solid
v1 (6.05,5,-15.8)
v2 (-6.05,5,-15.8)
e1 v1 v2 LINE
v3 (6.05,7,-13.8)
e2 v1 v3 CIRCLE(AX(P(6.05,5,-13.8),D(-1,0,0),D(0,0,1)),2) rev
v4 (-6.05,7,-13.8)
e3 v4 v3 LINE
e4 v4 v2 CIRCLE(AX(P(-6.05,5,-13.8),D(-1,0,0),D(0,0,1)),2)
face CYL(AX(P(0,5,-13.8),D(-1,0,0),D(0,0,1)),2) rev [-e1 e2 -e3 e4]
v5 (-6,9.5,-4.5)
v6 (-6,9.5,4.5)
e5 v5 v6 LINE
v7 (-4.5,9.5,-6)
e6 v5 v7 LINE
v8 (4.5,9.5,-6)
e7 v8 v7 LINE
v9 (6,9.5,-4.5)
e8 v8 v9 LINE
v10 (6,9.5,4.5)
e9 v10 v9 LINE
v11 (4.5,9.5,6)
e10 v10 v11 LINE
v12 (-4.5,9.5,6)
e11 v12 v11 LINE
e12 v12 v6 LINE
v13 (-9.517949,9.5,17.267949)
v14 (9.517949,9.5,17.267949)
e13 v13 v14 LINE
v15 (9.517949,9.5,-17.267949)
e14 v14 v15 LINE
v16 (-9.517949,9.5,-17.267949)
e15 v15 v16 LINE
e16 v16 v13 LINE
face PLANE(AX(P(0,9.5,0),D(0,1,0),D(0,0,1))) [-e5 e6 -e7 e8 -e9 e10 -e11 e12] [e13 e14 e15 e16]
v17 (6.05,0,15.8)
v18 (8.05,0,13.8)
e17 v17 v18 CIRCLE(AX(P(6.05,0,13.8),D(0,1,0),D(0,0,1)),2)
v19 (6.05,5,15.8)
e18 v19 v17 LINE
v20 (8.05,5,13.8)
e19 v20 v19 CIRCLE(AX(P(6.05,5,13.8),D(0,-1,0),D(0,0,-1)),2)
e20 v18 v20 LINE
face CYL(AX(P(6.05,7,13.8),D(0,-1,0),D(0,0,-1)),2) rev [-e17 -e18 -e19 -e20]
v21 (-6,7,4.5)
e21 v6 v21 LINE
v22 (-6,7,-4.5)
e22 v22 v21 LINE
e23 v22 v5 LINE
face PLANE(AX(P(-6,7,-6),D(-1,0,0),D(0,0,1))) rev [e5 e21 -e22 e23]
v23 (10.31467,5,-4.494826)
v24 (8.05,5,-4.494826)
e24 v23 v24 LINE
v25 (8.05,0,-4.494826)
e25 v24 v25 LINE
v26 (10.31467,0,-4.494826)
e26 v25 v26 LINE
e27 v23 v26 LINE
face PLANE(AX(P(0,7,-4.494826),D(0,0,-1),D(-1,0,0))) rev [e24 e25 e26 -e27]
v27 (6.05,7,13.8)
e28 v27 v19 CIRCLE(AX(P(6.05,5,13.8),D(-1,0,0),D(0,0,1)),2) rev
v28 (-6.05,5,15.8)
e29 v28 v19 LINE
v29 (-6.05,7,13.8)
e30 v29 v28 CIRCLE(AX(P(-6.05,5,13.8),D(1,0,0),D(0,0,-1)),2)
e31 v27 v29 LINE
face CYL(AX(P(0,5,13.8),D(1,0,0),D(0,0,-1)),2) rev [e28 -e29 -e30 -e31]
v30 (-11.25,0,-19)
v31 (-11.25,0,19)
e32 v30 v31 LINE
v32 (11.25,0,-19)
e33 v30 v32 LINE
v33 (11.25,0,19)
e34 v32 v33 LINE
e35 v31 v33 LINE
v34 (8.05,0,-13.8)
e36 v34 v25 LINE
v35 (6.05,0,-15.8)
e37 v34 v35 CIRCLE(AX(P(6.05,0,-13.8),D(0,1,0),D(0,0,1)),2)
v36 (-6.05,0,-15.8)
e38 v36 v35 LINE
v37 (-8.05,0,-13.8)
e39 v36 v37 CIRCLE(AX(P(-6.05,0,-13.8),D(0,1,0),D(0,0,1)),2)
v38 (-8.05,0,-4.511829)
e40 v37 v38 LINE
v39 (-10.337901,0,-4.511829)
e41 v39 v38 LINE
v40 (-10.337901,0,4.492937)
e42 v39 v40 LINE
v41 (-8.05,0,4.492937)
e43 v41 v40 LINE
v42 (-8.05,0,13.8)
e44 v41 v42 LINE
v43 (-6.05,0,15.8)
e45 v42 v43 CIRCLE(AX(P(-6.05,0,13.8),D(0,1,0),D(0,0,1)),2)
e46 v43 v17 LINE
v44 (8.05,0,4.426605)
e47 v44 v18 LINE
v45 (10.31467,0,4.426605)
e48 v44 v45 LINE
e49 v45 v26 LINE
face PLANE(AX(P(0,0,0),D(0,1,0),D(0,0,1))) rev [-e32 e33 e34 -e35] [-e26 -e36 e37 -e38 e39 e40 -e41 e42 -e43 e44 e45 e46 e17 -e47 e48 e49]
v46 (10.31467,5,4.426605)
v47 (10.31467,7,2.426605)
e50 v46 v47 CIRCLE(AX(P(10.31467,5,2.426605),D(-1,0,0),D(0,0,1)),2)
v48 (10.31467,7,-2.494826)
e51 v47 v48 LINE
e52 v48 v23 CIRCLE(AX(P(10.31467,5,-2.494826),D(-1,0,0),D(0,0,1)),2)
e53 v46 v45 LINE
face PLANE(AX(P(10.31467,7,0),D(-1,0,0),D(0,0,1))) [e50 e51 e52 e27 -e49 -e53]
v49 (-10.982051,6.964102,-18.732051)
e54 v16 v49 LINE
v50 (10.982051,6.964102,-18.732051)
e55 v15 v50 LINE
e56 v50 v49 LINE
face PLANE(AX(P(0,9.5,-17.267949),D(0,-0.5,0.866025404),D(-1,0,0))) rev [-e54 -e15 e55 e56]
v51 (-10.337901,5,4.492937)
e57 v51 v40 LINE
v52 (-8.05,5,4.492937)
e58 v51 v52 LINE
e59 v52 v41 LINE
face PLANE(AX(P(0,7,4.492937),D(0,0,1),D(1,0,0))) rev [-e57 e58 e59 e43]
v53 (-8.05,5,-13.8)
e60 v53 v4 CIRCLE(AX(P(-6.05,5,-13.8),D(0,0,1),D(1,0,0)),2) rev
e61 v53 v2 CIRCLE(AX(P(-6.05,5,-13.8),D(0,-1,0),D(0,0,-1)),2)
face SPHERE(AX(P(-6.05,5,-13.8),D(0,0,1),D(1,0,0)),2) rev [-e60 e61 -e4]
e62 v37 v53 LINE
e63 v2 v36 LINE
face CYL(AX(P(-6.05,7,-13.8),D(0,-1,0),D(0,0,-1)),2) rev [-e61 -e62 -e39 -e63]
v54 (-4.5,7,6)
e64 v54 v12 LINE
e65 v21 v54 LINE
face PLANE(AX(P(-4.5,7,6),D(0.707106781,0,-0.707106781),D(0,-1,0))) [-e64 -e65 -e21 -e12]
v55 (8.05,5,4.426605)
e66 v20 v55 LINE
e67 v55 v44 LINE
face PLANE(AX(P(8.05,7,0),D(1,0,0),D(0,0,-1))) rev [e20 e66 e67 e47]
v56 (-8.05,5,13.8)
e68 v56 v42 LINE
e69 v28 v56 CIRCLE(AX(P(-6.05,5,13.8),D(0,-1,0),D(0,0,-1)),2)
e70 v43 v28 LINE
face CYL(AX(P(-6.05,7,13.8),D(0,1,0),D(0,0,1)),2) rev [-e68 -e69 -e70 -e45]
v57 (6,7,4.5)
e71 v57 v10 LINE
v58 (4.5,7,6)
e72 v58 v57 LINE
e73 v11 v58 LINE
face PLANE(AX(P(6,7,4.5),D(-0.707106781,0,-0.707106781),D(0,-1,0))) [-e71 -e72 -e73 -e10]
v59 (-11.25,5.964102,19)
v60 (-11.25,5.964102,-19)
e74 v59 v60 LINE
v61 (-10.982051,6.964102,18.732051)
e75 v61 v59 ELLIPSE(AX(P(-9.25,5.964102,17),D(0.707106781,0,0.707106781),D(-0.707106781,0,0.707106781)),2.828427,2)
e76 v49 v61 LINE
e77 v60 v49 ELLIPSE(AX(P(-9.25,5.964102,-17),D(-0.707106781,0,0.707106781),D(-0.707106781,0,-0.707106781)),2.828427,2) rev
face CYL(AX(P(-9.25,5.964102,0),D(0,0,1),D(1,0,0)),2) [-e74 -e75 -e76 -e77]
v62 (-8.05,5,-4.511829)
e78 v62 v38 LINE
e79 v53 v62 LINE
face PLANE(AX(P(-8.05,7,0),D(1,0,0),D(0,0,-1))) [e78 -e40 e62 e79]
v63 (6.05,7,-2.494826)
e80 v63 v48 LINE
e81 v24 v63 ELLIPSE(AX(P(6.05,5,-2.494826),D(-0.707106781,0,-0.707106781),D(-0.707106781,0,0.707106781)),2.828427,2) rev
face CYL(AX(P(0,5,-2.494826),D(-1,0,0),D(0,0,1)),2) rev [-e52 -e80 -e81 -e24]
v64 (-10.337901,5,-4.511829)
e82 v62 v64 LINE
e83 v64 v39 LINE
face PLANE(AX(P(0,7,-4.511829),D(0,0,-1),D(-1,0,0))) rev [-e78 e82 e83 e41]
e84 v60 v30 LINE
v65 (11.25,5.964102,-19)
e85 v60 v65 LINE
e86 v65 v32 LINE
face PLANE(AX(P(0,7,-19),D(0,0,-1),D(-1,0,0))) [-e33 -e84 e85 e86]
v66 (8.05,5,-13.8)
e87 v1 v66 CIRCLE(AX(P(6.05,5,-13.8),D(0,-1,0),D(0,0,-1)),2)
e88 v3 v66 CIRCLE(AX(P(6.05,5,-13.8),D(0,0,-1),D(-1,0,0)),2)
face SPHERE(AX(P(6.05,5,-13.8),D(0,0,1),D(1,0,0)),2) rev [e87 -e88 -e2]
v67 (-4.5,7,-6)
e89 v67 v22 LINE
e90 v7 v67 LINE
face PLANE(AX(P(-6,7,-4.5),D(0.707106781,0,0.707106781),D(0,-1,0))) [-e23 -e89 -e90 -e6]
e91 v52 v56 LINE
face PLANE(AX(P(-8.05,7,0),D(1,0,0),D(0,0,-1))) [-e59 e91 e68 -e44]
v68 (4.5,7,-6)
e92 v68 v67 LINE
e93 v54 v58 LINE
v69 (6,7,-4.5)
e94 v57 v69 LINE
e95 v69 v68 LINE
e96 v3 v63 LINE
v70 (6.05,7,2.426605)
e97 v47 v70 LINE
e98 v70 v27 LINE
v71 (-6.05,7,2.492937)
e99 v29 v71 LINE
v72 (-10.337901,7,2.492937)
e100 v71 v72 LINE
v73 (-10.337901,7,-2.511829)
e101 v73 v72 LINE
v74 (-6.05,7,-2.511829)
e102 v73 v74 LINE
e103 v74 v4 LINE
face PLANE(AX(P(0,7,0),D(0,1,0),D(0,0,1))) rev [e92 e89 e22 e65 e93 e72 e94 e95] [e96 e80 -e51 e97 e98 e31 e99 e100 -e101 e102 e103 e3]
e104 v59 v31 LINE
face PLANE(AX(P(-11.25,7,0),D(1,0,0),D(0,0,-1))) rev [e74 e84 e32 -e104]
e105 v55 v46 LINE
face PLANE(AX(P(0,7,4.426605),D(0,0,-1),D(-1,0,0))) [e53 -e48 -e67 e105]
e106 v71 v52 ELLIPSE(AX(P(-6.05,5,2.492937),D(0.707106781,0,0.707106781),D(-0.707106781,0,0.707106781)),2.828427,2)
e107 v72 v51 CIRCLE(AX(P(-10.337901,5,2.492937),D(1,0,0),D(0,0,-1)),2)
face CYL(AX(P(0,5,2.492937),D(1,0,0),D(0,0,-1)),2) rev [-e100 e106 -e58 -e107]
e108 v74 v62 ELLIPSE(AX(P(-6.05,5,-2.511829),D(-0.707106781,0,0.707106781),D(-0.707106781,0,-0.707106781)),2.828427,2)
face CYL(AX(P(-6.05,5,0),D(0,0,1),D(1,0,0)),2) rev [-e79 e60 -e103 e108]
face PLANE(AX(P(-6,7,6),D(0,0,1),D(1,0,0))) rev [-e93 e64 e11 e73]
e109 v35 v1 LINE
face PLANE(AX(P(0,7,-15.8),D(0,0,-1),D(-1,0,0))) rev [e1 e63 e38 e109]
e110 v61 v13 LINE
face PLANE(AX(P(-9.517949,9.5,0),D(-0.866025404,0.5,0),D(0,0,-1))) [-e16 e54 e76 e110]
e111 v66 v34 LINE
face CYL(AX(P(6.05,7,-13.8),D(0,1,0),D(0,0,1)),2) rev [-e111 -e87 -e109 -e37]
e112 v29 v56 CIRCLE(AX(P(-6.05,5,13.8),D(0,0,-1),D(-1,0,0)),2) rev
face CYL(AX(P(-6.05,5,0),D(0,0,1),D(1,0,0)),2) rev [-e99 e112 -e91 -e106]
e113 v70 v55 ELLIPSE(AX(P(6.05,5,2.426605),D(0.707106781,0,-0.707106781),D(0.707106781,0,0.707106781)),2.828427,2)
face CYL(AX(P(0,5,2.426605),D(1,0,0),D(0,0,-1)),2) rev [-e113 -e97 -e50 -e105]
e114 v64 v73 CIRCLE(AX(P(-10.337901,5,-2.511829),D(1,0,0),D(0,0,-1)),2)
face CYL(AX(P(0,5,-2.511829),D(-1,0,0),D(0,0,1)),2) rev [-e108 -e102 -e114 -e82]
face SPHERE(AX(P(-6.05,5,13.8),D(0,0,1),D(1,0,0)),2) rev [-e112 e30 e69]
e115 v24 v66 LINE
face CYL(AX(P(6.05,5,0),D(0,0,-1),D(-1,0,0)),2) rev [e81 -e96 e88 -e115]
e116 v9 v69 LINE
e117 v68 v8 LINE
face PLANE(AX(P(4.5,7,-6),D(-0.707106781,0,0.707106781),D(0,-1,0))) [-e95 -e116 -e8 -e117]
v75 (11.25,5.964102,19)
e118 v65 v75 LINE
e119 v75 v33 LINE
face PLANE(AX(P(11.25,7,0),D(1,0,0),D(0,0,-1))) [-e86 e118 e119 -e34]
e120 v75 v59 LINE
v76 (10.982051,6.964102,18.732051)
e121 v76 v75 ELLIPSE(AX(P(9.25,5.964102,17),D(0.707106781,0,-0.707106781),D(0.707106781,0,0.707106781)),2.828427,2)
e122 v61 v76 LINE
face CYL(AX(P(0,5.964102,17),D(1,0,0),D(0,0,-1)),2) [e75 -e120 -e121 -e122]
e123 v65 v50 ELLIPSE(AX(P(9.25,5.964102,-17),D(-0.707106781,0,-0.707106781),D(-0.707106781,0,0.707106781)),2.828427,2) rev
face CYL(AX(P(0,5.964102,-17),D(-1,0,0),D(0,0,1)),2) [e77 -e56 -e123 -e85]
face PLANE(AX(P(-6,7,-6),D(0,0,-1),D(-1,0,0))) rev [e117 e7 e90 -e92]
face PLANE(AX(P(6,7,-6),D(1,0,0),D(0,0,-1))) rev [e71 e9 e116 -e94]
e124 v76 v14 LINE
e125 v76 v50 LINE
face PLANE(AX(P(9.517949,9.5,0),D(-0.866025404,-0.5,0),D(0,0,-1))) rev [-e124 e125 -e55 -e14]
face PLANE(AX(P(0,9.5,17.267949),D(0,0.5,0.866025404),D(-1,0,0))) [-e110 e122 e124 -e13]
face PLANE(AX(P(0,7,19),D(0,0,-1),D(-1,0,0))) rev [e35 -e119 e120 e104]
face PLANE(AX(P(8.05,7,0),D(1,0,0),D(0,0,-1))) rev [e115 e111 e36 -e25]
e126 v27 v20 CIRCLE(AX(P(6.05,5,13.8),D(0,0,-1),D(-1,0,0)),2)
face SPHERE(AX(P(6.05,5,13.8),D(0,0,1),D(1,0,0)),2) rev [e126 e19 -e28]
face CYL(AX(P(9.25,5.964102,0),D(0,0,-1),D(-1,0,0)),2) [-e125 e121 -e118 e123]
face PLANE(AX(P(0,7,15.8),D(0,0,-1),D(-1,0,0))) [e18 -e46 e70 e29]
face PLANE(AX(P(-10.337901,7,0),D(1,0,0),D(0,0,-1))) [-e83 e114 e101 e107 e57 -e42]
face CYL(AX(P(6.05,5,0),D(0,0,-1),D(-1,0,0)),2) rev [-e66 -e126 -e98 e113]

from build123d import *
from OCP.BRepFilletAPI import BRepFilletAPI_MakeChamfer

# Parameters (mm, degrees)
SKETCH1_W           = 22.5
SKETCH1_H           = 38
BOSS_EXTRUDE2_DEPTH = 7
SKETCH2_W           = 22.5
SKETCH2_H           = 38
BOSS_EXTRUDE4_DEPTH = 2.5
SKETCH3_W           = 12
SKETCH3_H           = 12
CUT_EXTRUDE1_DEPTH  = 2.5
CHAMFER1_SIZE       = 1.5
FILLET3_R           = 2
FILLET4_R           = 2
CHAMFER2_SIZE       = 3
CHAMFER2_SIZE2      = 1.732050808
FILLET5_R           = 2


with BuildPart() as part:
    # Sketch1 → Boss-Extrude2 (new body)
    with BuildSketch(Plane(origin=(0, 0, 0), x_dir=(1, 0, 0), z_dir=(0, 1, 0))):
        Rectangle(SKETCH1_W, SKETCH1_H)
        Polygon((-8.05, -15.8), (-8.05, -4.492937268), (-10.337901284, -4.492937268), (-10.337901284, 0), (-10.337901284, 4.511829369), (-8.05, 4.511829369), (-8.05, 15.8), (8.05, 15.8), (8.05, 4.494825775), (10.314669875, 4.494825775), (10.314669875, 0), (10.314669875, -4.426605317), (8.05, -4.426605317), (8.05, -15.8), align=None, mode=Mode.SUBTRACT)
    extrude(amount=BOSS_EXTRUDE2_DEPTH)

    # Sketch2 → Boss-Extrude4 (add)
    with BuildSketch(Plane(origin=(0, 7, 0), x_dir=(1, 0, 0), z_dir=(0, 1, 0))):
        Rectangle(SKETCH2_W, SKETCH2_H)
    extrude(amount=BOSS_EXTRUDE4_DEPTH)

    # Sketch3 → Cut-Extrude1 (cut)
    with BuildSketch(Plane(origin=(0, 9.5, 0), x_dir=(1, 0, 0), z_dir=(0, 1, 0))):
        Rectangle(SKETCH3_W, SKETCH3_H)
    extrude(amount=-CUT_EXTRUDE1_DEPTH, mode=Mode.SUBTRACT)

    # Chamfer1
    chamfer1_edges = [part.edges().sort_by_distance(p)[0] for p in [
        (6, 8.25, -6),
        (6, 8.25, 6),
        (-6, 8.25, 6),
        (-6, 8.25, -6),
    ]]
    chamfer(chamfer1_edges, length=CHAMFER1_SIZE)

    # Fillet3
    fillet3_edges = [part.edges().sort_by_distance(p)[0] for p in [
        (8.05, 7, 10.113302659),
        (0, 7, 15.8),
        (-8.05, 7, 10.146468634),
        (-9.193950642, 7, 4.492937268),
        (-8.05, 3.5, 15.8),
        (8.05, 3.5, 15.8),
        (-9.193950642, 7, -4.511829369),
        (-8.05, 7, -10.155914685),
        (0, 7, -15.8),
        (8.05, 7, -10.147412887),
        (9.182334937, 7, -4.494825775),
        (9.182334937, 7, 4.426605317),
    ]]
    fillet(fillet3_edges, radius=FILLET3_R)

    # Fillet4
    # the kernel refuses this fillet: 2 mm, written as the material it adds along each edge
    with BuildSketch(Plane(origin=(-6.05, 5, -13.8), x_dir=(-1, 0, 0), z_dir=(0, 0, -1))) as fillet4_piece_1_section:
        Polygon((0, 0), (FILLET4_R, 0), (FILLET4_R, FILLET4_R), (0, FILLET4_R), align=None)
    fillet4_piece_1 = extrude(amount=FILLET4_R, mode=Mode.PRIVATE)
    fillet4_piece_1 = fillet4_piece_1 - Plane(origin=(-6.05, 5, -13.8), x_dir=(0.7071067811865475, -0.7071067811865475, 0), z_dir=(0, 0, -1)) * Sphere(FILLET4_R, mode=Mode.PRIVATE)
    add(fillet4_piece_1)
    with BuildSketch(Plane(origin=(6.05, 5, -13.8), x_dir=(0, 0, -1), z_dir=(1, 0, 0))) as fillet4_piece_2_section:
        Polygon((0, 0), (FILLET4_R, 0), (FILLET4_R, FILLET4_R), (0, FILLET4_R), align=None)
    fillet4_piece_2 = extrude(amount=FILLET4_R, mode=Mode.PRIVATE)
    fillet4_piece_2 = fillet4_piece_2 - Plane(origin=(6.05, 5, -13.8), x_dir=(0, -0.7071067811865475, 0.7071067811865475), z_dir=(1, 0, 0)) * Sphere(FILLET4_R, mode=Mode.PRIVATE)
    add(fillet4_piece_2)
    with BuildSketch(Plane(origin=(8.05, 0, -15.8), x_dir=(0, 0, 1), z_dir=(0, 1, 0)), Plane(origin=(-8.05, 0, -15.8), x_dir=(1, 0, 0), z_dir=(0, 1, 0))) as fillet4_piece_3:
        with BuildLine():
            CenterArc((FILLET4_R, -FILLET4_R), FILLET4_R, 90, 90)
            Line((0, -FILLET4_R), (0, 0))
            Line((0, 0), (FILLET4_R, 0))
        make_face()
    extrude(amount=5)

    # Chamfer2: one chamfer whose edges measure the first distance from different faces: ONE call of the kernel's chamfer builder (chamfer() names one face for all edges)
    chamfer2_edges_1 = [part.edges().sort_by_distance(p)[0] for p in [
        (11.25, 9.5, 0),
    ]]
    chamfer2_side_1 = [part.faces().sort_by_distance(p)[0] for p in [
        (11.25, 4.75, 0),
    ]]
    chamfer2_edges_2 = [part.edges().sort_by_distance(p)[0] for p in [
        (0, 9.5, -19),
    ]]
    chamfer2_side_2 = [part.faces().sort_by_distance(p)[0] for p in [
        (0, 4.75, -19),
    ]]
    chamfer2_edges_3 = [part.edges().sort_by_distance(p)[0] for p in [
        (-11.25, 9.5, 0),
    ]]
    chamfer2_side_3 = [part.faces().sort_by_distance(p)[0] for p in [
        (-11.25, 4.75, 0),
    ]]
    chamfer2_edges_4 = [part.edges().sort_by_distance(p)[0] for p in [
        (0, 9.5, 19),
    ]]
    chamfer2_side_4 = [part.faces().sort_by_distance(p)[0] for p in [
        (0, 4.75, 19),
    ]]
    chamfer2 = BRepFilletAPI_MakeChamfer(part.part.solid().wrapped)
    for e in chamfer2_edges_1:
        chamfer2.Add(CHAMFER2_SIZE, CHAMFER2_SIZE2, e.wrapped, chamfer2_side_1[0].wrapped)  # the first distance lies on this face
    for e in chamfer2_edges_2:
        chamfer2.Add(CHAMFER2_SIZE, CHAMFER2_SIZE2, e.wrapped, chamfer2_side_2[0].wrapped)  # the first distance lies on this face
    for e in chamfer2_edges_3:
        chamfer2.Add(CHAMFER2_SIZE, CHAMFER2_SIZE2, e.wrapped, chamfer2_side_3[0].wrapped)  # the first distance lies on this face
    for e in chamfer2_edges_4:
        chamfer2.Add(CHAMFER2_SIZE, CHAMFER2_SIZE2, e.wrapped, chamfer2_side_4[0].wrapped)  # the first distance lies on this face
    add(Compound.cast(chamfer2.Shape()), mode=Mode.REPLACE)

    # Fillet5
    fillet5_edges = [part.edges().sort_by_distance(p)[0] for p in [
        (-11.25, 6.5, 0),
        (0, 6.5, -19),
        (11.25, 6.5, 0),
        (0, 6.5, 19),
    ]]
    fillet(fillet5_edges, radius=FILLET5_R)


solid = part.part
